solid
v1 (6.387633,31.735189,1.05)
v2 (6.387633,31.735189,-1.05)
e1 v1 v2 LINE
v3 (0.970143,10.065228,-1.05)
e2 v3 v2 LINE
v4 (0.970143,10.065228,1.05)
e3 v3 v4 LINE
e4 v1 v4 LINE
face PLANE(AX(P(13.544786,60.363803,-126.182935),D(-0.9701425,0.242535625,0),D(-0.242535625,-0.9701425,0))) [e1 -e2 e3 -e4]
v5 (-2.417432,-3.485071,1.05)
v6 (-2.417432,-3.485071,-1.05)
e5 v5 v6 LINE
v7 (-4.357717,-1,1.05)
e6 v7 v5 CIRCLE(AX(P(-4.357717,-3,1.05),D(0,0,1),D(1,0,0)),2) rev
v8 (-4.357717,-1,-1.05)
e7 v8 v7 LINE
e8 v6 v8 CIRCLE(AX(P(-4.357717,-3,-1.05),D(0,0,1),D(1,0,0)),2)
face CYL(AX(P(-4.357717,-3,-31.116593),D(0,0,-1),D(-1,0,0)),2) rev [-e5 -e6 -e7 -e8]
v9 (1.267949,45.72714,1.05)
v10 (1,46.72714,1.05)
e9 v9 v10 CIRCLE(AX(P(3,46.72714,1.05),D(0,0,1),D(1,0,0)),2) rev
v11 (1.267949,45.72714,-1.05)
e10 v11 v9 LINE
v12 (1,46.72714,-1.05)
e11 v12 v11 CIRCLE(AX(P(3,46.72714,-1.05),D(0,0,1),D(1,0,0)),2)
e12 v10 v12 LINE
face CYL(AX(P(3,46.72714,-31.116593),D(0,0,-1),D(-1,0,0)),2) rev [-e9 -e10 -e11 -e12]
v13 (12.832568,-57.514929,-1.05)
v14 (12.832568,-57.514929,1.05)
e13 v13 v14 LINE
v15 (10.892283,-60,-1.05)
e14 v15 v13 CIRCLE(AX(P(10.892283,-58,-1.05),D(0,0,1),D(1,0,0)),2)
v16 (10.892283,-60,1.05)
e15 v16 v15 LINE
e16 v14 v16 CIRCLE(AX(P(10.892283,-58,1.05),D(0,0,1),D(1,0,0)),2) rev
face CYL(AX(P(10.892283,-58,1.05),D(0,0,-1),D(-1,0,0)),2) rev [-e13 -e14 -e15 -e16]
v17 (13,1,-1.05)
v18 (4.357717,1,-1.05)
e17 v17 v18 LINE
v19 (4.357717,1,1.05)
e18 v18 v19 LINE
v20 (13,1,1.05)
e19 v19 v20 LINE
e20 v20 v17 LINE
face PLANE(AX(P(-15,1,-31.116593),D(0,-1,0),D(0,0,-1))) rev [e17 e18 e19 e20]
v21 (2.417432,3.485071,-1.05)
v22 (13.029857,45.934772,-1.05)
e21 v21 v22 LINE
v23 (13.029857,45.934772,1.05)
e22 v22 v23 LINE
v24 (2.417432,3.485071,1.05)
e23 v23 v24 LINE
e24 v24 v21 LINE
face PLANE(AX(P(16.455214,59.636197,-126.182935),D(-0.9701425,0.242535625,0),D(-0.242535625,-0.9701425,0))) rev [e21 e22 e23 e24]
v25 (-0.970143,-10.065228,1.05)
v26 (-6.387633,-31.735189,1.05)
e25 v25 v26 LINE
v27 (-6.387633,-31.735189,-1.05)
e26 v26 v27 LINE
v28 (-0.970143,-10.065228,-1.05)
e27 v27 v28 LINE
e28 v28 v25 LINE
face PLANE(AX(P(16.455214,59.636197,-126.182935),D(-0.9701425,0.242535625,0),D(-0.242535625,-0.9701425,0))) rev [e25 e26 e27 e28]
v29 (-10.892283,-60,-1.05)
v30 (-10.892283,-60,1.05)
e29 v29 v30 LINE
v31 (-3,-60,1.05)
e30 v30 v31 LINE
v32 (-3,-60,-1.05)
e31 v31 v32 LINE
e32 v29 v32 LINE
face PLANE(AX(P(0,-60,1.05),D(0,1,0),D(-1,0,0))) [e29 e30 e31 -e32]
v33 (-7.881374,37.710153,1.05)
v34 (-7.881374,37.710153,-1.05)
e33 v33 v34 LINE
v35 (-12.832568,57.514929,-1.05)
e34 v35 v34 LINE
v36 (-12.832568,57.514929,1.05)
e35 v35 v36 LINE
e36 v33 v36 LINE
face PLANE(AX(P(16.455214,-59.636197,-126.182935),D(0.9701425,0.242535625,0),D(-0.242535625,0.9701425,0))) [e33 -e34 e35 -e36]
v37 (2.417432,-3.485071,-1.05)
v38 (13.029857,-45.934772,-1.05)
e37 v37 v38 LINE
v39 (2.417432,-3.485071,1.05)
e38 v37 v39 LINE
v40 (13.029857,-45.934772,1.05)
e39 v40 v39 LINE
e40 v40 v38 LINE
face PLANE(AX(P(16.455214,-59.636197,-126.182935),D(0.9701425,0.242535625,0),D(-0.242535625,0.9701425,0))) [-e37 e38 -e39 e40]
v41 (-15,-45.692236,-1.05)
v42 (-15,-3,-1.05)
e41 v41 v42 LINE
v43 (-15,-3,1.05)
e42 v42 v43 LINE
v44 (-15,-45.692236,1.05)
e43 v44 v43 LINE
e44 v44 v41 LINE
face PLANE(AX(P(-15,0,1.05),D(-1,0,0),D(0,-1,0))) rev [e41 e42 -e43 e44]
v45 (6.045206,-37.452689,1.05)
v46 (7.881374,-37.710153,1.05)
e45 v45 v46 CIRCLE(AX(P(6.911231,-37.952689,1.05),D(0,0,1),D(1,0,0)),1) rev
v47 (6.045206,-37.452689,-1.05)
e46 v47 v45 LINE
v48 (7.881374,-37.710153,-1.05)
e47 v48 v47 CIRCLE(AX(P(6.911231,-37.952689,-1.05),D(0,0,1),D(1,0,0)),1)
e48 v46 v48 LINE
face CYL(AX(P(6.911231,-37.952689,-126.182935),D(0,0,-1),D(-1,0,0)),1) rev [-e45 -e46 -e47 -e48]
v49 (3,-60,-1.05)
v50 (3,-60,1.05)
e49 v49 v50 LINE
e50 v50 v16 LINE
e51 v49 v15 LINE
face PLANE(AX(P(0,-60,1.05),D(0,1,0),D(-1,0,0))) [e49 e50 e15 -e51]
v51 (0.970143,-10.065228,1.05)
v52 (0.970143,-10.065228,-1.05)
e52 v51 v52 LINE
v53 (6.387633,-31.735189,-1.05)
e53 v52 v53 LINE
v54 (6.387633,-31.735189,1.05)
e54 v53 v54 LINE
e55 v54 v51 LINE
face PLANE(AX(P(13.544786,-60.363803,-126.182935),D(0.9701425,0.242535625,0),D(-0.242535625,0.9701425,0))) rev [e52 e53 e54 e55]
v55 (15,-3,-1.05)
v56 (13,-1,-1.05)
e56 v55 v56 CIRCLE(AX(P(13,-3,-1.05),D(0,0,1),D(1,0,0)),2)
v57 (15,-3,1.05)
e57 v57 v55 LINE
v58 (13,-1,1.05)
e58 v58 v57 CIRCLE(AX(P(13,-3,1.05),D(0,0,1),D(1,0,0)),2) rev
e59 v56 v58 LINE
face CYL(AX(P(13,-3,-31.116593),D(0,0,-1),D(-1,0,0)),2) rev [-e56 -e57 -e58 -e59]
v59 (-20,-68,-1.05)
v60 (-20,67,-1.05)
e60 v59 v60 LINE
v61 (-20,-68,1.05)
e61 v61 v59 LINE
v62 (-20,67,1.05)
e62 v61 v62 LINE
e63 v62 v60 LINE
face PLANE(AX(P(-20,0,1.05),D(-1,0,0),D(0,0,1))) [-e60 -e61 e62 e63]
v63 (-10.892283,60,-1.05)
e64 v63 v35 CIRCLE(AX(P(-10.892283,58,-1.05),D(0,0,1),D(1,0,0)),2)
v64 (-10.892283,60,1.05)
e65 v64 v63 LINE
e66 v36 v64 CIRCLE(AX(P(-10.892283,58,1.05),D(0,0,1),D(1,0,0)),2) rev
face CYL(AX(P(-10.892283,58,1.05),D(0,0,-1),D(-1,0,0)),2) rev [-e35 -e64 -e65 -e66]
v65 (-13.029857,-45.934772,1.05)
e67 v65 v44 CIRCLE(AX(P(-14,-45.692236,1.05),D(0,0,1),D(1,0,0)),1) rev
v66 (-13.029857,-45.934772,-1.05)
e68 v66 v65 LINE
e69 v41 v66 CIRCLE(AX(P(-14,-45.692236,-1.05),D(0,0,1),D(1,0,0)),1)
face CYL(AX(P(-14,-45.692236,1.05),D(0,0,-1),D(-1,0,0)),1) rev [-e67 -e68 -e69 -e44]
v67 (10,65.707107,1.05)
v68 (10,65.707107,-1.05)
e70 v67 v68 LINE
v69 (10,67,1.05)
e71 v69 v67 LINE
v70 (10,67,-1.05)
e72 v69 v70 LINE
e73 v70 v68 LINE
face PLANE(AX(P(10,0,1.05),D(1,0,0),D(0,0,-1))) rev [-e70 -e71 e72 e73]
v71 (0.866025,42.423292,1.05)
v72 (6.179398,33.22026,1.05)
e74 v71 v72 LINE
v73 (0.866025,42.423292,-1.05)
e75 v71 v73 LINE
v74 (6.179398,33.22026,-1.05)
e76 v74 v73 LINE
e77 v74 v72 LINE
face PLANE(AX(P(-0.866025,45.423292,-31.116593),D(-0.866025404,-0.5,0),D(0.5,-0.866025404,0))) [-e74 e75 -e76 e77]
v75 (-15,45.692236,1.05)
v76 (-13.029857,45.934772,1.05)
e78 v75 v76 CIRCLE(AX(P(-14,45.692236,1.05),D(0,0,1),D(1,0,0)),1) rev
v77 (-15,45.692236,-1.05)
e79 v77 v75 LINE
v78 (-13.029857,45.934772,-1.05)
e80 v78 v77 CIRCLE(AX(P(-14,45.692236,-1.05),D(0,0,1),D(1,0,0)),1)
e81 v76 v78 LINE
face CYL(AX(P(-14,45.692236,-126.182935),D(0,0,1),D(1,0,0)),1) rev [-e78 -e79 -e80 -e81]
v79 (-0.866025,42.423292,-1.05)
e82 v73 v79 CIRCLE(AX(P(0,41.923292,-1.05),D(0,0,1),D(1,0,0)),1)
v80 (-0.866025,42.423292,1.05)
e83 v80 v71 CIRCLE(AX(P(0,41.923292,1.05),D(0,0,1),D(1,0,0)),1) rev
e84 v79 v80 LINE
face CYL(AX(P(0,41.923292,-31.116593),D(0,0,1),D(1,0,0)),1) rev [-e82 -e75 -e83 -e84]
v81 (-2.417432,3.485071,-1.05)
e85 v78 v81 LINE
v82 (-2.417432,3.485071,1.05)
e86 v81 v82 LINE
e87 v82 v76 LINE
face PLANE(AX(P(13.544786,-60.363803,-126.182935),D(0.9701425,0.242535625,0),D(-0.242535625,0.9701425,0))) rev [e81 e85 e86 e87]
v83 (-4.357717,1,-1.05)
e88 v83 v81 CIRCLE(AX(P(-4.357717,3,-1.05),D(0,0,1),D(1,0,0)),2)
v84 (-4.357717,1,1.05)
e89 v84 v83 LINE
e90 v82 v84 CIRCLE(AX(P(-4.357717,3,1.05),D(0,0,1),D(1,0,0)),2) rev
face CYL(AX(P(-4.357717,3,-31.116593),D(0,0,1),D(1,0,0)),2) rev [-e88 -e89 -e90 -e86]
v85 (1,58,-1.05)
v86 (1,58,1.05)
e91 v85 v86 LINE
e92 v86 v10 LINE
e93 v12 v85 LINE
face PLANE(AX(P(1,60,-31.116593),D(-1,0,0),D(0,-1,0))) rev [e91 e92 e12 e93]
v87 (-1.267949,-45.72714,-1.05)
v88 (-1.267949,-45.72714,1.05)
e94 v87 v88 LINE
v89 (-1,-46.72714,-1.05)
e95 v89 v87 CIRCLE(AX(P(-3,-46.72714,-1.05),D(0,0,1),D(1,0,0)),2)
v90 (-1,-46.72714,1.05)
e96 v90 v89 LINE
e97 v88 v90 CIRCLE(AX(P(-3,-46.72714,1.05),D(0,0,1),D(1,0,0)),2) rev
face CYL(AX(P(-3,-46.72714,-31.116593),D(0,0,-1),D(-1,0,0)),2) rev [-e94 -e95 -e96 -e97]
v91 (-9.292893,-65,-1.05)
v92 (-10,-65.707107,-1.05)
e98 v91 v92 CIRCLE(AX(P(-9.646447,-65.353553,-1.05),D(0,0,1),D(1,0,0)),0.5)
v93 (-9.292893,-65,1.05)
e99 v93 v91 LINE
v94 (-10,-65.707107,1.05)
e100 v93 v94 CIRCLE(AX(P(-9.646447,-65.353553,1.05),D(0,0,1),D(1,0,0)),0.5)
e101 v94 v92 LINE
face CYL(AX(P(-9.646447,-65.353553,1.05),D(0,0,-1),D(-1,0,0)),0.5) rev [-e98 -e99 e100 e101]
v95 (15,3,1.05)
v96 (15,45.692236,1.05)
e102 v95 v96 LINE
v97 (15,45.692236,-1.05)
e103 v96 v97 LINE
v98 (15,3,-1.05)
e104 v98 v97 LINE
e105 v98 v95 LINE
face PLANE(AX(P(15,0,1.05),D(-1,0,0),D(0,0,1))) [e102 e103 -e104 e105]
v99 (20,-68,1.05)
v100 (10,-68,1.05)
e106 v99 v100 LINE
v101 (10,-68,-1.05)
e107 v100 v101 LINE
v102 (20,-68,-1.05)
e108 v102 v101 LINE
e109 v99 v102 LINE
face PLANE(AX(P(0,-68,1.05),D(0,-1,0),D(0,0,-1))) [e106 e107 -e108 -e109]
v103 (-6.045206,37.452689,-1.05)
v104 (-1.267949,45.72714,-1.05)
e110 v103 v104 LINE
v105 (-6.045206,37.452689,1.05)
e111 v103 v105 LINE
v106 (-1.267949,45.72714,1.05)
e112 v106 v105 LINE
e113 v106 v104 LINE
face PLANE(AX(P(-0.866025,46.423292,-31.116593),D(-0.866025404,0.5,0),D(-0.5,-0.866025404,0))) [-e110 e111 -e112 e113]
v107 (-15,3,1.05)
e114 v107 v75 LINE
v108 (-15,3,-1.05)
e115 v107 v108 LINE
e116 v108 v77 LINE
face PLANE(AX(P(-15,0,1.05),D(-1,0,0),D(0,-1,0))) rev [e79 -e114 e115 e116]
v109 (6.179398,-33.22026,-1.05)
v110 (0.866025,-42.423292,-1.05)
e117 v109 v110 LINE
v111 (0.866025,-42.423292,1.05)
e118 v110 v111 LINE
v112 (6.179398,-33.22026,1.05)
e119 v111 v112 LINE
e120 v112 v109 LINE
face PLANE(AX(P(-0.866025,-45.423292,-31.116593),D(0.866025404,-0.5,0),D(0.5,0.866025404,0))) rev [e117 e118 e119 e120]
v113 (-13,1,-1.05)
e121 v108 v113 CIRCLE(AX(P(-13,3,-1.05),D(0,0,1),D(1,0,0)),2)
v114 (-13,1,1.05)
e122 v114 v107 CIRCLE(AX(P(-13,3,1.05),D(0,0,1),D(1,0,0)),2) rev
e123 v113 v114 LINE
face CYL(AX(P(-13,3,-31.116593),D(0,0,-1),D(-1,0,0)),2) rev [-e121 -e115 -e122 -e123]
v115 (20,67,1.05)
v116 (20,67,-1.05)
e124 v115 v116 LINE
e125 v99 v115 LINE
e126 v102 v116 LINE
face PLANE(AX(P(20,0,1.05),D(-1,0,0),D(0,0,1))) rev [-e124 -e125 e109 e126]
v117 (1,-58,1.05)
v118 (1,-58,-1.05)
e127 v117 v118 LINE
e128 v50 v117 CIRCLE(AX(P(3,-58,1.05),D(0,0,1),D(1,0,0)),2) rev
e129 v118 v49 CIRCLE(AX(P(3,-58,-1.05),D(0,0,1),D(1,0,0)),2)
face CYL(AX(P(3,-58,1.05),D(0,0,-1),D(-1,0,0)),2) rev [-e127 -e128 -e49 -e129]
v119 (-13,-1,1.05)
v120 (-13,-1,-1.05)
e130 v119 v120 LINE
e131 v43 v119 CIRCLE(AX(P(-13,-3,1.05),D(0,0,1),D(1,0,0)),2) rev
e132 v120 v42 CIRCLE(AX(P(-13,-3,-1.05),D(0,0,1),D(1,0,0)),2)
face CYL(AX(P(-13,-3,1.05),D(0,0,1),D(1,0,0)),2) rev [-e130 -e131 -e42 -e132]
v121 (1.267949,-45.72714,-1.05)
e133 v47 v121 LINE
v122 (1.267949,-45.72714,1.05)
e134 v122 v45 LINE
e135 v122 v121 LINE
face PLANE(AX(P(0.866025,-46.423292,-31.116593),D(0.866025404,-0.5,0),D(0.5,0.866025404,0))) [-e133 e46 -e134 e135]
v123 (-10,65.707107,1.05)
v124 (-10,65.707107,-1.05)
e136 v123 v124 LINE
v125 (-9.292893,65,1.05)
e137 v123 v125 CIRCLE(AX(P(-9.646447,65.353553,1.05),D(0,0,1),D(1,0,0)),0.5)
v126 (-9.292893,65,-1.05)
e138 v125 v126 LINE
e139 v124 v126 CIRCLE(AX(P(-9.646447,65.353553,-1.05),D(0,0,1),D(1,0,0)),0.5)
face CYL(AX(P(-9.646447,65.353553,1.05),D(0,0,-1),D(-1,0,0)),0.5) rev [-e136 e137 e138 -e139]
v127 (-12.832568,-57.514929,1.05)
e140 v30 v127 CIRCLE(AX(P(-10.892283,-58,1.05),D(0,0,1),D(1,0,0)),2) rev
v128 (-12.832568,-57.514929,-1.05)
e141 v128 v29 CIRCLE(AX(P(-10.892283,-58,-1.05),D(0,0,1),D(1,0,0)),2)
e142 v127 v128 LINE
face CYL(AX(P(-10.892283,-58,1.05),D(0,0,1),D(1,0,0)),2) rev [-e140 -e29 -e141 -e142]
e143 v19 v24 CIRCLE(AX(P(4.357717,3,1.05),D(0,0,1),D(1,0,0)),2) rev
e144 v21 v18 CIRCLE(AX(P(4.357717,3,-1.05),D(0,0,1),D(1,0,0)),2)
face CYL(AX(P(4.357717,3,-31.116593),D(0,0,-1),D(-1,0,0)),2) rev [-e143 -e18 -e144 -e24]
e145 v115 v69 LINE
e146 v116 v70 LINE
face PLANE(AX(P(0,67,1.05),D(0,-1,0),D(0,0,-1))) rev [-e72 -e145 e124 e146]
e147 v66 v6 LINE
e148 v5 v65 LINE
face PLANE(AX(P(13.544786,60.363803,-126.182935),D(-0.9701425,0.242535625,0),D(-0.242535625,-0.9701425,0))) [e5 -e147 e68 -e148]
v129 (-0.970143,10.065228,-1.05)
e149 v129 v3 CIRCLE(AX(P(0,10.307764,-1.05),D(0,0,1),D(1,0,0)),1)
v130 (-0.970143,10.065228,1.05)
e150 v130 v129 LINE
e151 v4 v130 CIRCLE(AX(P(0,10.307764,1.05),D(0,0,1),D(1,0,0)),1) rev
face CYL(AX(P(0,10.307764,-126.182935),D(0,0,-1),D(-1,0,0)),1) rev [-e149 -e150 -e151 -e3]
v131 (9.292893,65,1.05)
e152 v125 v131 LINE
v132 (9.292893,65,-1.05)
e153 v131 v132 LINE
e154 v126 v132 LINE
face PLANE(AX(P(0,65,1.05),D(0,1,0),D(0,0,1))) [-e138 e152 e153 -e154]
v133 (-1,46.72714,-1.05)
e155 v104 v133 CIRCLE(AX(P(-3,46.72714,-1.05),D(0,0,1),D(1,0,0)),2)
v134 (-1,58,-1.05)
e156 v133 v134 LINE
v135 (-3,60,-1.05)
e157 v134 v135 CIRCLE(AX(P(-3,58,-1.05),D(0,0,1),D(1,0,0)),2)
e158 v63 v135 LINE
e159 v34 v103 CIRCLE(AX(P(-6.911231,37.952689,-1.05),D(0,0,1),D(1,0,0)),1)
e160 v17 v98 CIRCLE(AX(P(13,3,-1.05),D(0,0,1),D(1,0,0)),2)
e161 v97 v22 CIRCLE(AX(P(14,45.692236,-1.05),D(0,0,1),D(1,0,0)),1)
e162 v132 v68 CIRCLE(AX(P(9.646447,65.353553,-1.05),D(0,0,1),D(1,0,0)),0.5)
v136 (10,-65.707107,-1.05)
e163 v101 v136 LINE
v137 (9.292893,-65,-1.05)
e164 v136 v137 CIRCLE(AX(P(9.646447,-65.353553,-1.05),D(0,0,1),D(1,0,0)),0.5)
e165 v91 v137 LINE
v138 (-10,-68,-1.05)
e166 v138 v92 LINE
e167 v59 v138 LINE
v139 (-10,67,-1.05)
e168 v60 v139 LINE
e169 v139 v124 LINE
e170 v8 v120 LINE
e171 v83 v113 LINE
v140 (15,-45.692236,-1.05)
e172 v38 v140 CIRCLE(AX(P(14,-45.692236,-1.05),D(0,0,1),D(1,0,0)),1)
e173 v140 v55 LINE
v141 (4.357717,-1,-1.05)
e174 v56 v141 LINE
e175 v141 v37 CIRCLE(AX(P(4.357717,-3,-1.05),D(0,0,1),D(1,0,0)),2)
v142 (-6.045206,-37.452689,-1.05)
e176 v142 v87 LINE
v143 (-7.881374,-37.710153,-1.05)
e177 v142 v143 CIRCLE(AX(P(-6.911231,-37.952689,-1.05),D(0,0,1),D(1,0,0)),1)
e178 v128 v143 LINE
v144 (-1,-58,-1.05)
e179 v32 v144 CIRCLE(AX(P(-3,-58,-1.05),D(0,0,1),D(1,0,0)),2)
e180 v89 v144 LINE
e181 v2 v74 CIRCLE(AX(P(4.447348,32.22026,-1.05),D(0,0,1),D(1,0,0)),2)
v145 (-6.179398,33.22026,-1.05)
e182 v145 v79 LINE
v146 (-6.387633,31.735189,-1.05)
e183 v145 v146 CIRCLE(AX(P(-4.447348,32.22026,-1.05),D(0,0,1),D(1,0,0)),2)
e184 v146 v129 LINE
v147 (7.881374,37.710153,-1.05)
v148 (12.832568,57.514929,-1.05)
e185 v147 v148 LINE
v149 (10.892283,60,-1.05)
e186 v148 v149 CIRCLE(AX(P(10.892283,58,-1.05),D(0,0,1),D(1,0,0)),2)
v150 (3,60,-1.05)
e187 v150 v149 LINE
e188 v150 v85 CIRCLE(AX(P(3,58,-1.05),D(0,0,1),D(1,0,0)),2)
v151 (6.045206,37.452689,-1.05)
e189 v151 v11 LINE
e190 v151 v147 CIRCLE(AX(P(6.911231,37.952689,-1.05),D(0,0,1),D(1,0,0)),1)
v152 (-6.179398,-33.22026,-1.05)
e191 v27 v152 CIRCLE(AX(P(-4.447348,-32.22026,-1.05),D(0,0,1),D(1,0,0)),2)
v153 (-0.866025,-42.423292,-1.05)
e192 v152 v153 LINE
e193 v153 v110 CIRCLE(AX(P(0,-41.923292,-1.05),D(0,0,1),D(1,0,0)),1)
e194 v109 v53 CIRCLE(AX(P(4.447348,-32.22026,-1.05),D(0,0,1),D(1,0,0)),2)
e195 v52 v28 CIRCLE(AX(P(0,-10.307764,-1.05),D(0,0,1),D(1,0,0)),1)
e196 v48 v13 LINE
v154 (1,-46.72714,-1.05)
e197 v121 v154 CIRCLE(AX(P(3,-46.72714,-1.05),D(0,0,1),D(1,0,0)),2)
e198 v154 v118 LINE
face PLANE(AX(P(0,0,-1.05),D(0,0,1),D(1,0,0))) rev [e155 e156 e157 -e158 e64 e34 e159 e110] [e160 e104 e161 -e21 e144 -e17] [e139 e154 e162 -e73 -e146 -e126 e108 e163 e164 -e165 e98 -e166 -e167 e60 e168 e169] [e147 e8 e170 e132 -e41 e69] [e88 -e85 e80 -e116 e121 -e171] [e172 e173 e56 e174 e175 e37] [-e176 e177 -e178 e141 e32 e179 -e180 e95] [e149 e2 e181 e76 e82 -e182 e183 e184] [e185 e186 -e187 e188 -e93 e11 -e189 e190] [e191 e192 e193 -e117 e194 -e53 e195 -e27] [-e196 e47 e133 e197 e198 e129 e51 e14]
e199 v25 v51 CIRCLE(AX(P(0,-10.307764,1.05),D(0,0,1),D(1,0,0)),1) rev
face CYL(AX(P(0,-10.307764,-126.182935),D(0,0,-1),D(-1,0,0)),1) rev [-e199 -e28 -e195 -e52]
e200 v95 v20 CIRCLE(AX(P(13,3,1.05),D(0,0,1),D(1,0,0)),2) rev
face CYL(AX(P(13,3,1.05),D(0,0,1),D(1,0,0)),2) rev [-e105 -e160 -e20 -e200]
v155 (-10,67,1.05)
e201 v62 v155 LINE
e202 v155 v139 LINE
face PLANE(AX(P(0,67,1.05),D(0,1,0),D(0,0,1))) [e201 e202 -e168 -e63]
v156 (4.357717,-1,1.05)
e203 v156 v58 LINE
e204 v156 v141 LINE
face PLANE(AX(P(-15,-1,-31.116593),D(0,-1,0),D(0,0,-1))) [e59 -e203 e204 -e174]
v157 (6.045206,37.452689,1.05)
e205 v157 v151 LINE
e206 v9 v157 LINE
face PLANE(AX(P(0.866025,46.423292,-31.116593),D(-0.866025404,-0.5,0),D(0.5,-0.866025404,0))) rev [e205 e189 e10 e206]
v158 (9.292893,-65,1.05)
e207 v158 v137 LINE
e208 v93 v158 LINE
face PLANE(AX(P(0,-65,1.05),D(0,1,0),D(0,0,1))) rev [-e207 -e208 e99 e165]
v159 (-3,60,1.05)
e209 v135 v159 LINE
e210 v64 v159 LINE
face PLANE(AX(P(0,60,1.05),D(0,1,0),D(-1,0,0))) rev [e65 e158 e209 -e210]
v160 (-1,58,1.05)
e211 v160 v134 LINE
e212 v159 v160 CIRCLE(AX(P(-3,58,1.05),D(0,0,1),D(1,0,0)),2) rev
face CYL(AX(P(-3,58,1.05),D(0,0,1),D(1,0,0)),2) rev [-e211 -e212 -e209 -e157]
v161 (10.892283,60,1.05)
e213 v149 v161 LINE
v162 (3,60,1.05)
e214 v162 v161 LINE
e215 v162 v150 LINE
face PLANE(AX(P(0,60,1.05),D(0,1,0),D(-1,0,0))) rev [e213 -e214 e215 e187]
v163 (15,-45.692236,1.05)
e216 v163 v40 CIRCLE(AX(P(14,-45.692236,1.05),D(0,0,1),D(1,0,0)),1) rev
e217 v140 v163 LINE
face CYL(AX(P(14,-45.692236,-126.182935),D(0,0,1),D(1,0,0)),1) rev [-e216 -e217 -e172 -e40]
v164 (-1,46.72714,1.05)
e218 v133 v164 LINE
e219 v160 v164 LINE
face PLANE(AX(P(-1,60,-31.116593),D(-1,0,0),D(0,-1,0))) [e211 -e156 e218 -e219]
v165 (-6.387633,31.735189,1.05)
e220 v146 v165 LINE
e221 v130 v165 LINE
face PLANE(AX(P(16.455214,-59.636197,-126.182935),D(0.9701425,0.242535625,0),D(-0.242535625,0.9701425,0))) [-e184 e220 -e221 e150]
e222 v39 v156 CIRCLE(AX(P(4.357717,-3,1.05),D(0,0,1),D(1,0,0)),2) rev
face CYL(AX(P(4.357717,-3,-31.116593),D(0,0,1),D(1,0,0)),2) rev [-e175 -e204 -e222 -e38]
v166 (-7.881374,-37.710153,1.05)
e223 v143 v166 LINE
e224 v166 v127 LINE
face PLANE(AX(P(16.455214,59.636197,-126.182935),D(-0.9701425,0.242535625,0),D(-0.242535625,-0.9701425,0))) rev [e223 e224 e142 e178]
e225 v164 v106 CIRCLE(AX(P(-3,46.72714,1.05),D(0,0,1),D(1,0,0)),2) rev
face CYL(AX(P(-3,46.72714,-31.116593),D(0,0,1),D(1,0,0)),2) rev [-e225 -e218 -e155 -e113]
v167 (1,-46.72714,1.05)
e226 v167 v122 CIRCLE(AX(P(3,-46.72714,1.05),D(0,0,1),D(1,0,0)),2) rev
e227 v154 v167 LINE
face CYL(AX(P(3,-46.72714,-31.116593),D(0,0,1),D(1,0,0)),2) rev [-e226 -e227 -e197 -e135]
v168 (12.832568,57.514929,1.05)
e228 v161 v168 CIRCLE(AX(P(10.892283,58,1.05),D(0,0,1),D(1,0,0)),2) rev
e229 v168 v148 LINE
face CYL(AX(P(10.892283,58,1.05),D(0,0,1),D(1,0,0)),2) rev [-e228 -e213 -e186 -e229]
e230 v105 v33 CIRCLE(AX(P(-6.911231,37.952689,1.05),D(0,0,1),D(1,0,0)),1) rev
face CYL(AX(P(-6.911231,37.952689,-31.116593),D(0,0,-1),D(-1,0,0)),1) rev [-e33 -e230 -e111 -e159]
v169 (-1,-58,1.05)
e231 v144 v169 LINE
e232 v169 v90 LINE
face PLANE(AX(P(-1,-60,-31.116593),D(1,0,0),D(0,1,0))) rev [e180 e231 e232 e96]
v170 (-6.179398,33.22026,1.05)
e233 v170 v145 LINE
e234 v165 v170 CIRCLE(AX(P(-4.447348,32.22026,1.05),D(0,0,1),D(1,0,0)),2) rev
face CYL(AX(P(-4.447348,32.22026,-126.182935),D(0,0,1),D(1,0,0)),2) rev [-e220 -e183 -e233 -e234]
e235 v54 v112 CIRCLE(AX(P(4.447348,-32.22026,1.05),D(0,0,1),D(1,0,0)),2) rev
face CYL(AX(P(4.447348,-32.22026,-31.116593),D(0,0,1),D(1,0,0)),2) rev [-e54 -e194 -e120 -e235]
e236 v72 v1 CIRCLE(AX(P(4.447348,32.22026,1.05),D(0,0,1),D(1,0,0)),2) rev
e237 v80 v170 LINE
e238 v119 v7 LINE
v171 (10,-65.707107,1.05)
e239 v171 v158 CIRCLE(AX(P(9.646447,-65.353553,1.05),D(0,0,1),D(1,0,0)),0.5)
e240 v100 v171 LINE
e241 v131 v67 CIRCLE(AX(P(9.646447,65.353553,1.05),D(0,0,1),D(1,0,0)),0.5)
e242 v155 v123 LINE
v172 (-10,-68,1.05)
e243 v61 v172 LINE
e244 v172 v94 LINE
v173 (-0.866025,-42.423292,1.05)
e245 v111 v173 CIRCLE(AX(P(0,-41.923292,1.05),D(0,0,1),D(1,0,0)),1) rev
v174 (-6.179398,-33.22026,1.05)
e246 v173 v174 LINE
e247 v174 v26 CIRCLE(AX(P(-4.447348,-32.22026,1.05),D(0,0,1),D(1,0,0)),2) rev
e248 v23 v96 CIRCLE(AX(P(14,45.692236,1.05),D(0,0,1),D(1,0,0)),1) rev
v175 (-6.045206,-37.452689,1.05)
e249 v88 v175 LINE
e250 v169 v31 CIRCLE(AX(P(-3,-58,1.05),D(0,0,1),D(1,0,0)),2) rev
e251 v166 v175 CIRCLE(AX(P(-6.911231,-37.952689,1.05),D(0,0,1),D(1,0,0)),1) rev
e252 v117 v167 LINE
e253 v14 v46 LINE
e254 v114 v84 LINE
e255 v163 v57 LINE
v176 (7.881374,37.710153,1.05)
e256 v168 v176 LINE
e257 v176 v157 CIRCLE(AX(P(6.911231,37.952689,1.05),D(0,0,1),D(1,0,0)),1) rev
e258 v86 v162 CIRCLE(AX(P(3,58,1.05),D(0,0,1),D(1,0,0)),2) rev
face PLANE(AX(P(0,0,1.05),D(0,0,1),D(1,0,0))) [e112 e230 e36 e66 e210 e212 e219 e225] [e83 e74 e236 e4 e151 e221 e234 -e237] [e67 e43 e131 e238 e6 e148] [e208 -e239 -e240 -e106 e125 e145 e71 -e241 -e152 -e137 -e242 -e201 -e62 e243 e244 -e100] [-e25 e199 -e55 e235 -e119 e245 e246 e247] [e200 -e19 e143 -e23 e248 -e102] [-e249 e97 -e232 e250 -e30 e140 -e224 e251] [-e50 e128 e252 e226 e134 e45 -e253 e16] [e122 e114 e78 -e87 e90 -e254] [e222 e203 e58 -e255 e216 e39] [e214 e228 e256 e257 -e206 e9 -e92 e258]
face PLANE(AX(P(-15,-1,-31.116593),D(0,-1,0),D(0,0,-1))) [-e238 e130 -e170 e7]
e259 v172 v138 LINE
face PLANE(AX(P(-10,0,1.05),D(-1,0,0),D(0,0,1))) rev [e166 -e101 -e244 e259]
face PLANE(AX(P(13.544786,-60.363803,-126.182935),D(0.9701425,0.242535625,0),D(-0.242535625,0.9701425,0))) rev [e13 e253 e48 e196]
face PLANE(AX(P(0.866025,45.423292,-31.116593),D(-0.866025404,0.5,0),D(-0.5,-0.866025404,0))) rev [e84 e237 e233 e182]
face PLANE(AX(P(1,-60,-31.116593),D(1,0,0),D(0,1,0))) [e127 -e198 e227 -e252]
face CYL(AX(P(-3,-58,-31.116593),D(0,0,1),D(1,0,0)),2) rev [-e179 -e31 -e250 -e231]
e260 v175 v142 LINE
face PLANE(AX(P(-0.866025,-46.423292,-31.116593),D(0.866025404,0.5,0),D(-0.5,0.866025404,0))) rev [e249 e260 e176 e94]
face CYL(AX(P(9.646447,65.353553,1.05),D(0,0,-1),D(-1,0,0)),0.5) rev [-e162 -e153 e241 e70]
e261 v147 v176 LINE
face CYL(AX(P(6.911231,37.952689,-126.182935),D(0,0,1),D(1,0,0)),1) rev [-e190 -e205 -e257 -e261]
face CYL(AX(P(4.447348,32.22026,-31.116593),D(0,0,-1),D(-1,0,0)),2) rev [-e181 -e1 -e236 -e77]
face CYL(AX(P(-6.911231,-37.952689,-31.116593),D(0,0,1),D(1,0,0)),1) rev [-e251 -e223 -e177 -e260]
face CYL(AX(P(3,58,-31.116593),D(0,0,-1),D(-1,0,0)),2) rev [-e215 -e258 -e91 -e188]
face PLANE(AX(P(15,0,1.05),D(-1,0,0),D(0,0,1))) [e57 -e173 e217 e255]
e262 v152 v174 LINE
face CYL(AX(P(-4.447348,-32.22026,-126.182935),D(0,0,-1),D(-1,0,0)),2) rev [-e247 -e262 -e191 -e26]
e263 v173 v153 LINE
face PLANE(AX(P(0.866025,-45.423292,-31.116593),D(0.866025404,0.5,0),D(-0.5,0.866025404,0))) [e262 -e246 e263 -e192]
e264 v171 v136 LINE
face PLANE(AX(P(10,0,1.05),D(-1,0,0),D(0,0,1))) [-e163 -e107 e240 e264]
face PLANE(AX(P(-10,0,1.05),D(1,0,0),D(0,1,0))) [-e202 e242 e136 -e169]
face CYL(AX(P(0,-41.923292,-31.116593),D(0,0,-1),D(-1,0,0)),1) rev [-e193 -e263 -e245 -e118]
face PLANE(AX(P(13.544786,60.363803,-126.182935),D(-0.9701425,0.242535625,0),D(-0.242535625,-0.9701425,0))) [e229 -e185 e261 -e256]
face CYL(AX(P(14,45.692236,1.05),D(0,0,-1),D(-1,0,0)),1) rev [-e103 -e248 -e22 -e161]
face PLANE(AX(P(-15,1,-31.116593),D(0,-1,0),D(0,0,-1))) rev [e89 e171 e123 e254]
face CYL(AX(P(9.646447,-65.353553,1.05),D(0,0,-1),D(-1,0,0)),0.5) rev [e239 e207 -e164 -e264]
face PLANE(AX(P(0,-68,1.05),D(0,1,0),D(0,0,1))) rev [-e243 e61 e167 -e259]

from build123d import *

# Parameters (mm, degrees)
SKETCH_1_W        = 30
SKETCH_1_H        = 120
EXTRUDE_1_DEPTH   = 1.05
EXTRUDE_1_2_DEPTH = 2.1
EXTRUDE_START     = -2.1
EXTRUDE_3_DEPTH   = 2.1
FILLET_1_R        = 1
FILLET_2_R        = 2
FILLET_3_R        = 1


# Read off the part's stored shape, not the designer's step: 拉伸-薄壁3
with BuildPart() as part:
    # 草图1 → Extrude 1 (new, symmetric)
    with BuildSketch(Plane.XY):
        with BuildLine():
            Line((20, -68), (20, 67))
            Line((20, 67), (10, 67))
            Line((10, 67), (10, 65.707106781))
            ThreePointArc((10, 65.707106781), (10, 65), (9.292893219, 65))
            Line((9.292893219, 65), (-9.292893219, 65))
            ThreePointArc((-9.292893219, 65), (-10, 65), (-10, 65.707106781))
            Line((-10, 65.707106781), (-10, 67))
            Line((-10, 67), (-20, 67))
            Line((-20, 67), (-20, -68))
            Line((-20, -68), (-10, -68))
            Line((-10, -68), (-10, -65.707106781))
            ThreePointArc((-10, -65.707106781), (-10, -65), (-9.292893219, -65))
            Line((-9.292893219, -65), (9.292893219, -65))
            ThreePointArc((9.292893219, -65), (10, -65), (10, -65.707106781))
            Line((10, -65.707106781), (10, -68))
            Line((10, -68), (20, -68))
        make_face()
        Rectangle(SKETCH_1_W, SKETCH_1_H, mode=Mode.SUBTRACT)
    extrude(amount=EXTRUDE_1_DEPTH, both=True)

    # 草图2 → Extrude 1 2 (add)
    with BuildSketch(Plane.XY.offset(1.05)):
        Polygon((13.54478625, 60.363803438), (-16.45521375, -59.636196562), (-13.54478625, -60.363803438), (16.45521375, 59.636196562), align=None)
        Polygon((16.45521375, -59.636196562), (-13.54478625, 60.363803438), (-16.45521375, 59.636196562), (13.54478625, -60.363803438), align=None)
    extrude(amount=-EXTRUDE_1_2_DEPTH)

    # 拉伸-薄壁3 outline → 拉伸-薄壁3 (add)
    with BuildSketch(Plane.XY.offset(1.05).offset(EXTRUDE_START)):
        Polygon((15, 1), (1.79616461, 1), (1.54616461, 0), (1.79616461, -1), (15, -1), align=None)
        Polygon((-1.79616461, 1), (-15, 1), (-15, -1), (-1.79616461, -1), (-1.54616461, 0), align=None)
        Polygon((1, 46.191241385), (1, 60), (-1, 60), (-1, 46.191241385), (-7.281623132, 35.311150966), (-6.583792611, 32.519828883), (0, 43.923292192), (6.583792611, 32.519828883), (7.281623132, 35.311150966), align=None)
    extrude_3 = extrude(amount=EXTRUDE_3_DEPTH)

    # 镜向1: 拉伸-薄壁3 across plane
    add(extrude_3.mirror(Plane.ZX))

    # 圆角1
    fillet_1_edges = [part.edges().sort_by_distance(p)[0] for p in [
        (15, 53.815341562, 0),
        (0, 6.184658438, 0),
        (15, -53.815341562, 0),
        (0, -6.184658438, 0),
        (-15, -53.815341562, 0),
        (-15, 53.815341562, 0),
    ]]
    fillet(fillet_1_edges, radius=FILLET_1_R)

    # 圆角2
    fillet_2_edges = [part.edges().sort_by_distance(p)[0] for p in [
        (13.45383539, -60, 0),
        (-13.45383539, -60, 0),
        (-13.45383539, 60, 0),
        (13.45383539, 60, 0),
        (1.79616461, 1, 0),
        (1.79616461, -1, 0),
        (-1.79616461, -1, 0),
        (-1.79616461, 1, 0),
        (-15, 1, 0),
        (15, 1, 0),
        (-15, -1, 0),
        (15, -1, 0),
        (6.583792611, 32.519828883, 0),
        (-6.583792611, 32.519828883, 0),
        (1, 60, 0),
        (-1, 60, 0),
        (-1, 46.191241385, 0),
        (1, 46.191241385, 0),
        (-6.583792611, -32.519828883, 0),
        (6.583792611, -32.519828883, 0),
        (1, -46.191241385, 0),
        (-1, -46.191241385, 0),
        (-1, -60, 0),
        (1, -60, 0),
    ]]
    fillet(fillet_2_edges, radius=FILLET_2_R)

    # 圆角3
    fillet_3_edges = [part.edges().sort_by_distance(p)[0] for p in [
        (7.281623132, 35.311150966, 0),
        (-7.281623132, 35.311150966, 0),
        (0, 43.923292192, 0),
        (-7.281623132, -35.311150966, 0),
        (7.281623132, -35.311150966, 0),
        (0, -43.923292192, 0),
    ]]
    fillet(fillet_3_edges, radius=FILLET_3_R)


solid = part.part
